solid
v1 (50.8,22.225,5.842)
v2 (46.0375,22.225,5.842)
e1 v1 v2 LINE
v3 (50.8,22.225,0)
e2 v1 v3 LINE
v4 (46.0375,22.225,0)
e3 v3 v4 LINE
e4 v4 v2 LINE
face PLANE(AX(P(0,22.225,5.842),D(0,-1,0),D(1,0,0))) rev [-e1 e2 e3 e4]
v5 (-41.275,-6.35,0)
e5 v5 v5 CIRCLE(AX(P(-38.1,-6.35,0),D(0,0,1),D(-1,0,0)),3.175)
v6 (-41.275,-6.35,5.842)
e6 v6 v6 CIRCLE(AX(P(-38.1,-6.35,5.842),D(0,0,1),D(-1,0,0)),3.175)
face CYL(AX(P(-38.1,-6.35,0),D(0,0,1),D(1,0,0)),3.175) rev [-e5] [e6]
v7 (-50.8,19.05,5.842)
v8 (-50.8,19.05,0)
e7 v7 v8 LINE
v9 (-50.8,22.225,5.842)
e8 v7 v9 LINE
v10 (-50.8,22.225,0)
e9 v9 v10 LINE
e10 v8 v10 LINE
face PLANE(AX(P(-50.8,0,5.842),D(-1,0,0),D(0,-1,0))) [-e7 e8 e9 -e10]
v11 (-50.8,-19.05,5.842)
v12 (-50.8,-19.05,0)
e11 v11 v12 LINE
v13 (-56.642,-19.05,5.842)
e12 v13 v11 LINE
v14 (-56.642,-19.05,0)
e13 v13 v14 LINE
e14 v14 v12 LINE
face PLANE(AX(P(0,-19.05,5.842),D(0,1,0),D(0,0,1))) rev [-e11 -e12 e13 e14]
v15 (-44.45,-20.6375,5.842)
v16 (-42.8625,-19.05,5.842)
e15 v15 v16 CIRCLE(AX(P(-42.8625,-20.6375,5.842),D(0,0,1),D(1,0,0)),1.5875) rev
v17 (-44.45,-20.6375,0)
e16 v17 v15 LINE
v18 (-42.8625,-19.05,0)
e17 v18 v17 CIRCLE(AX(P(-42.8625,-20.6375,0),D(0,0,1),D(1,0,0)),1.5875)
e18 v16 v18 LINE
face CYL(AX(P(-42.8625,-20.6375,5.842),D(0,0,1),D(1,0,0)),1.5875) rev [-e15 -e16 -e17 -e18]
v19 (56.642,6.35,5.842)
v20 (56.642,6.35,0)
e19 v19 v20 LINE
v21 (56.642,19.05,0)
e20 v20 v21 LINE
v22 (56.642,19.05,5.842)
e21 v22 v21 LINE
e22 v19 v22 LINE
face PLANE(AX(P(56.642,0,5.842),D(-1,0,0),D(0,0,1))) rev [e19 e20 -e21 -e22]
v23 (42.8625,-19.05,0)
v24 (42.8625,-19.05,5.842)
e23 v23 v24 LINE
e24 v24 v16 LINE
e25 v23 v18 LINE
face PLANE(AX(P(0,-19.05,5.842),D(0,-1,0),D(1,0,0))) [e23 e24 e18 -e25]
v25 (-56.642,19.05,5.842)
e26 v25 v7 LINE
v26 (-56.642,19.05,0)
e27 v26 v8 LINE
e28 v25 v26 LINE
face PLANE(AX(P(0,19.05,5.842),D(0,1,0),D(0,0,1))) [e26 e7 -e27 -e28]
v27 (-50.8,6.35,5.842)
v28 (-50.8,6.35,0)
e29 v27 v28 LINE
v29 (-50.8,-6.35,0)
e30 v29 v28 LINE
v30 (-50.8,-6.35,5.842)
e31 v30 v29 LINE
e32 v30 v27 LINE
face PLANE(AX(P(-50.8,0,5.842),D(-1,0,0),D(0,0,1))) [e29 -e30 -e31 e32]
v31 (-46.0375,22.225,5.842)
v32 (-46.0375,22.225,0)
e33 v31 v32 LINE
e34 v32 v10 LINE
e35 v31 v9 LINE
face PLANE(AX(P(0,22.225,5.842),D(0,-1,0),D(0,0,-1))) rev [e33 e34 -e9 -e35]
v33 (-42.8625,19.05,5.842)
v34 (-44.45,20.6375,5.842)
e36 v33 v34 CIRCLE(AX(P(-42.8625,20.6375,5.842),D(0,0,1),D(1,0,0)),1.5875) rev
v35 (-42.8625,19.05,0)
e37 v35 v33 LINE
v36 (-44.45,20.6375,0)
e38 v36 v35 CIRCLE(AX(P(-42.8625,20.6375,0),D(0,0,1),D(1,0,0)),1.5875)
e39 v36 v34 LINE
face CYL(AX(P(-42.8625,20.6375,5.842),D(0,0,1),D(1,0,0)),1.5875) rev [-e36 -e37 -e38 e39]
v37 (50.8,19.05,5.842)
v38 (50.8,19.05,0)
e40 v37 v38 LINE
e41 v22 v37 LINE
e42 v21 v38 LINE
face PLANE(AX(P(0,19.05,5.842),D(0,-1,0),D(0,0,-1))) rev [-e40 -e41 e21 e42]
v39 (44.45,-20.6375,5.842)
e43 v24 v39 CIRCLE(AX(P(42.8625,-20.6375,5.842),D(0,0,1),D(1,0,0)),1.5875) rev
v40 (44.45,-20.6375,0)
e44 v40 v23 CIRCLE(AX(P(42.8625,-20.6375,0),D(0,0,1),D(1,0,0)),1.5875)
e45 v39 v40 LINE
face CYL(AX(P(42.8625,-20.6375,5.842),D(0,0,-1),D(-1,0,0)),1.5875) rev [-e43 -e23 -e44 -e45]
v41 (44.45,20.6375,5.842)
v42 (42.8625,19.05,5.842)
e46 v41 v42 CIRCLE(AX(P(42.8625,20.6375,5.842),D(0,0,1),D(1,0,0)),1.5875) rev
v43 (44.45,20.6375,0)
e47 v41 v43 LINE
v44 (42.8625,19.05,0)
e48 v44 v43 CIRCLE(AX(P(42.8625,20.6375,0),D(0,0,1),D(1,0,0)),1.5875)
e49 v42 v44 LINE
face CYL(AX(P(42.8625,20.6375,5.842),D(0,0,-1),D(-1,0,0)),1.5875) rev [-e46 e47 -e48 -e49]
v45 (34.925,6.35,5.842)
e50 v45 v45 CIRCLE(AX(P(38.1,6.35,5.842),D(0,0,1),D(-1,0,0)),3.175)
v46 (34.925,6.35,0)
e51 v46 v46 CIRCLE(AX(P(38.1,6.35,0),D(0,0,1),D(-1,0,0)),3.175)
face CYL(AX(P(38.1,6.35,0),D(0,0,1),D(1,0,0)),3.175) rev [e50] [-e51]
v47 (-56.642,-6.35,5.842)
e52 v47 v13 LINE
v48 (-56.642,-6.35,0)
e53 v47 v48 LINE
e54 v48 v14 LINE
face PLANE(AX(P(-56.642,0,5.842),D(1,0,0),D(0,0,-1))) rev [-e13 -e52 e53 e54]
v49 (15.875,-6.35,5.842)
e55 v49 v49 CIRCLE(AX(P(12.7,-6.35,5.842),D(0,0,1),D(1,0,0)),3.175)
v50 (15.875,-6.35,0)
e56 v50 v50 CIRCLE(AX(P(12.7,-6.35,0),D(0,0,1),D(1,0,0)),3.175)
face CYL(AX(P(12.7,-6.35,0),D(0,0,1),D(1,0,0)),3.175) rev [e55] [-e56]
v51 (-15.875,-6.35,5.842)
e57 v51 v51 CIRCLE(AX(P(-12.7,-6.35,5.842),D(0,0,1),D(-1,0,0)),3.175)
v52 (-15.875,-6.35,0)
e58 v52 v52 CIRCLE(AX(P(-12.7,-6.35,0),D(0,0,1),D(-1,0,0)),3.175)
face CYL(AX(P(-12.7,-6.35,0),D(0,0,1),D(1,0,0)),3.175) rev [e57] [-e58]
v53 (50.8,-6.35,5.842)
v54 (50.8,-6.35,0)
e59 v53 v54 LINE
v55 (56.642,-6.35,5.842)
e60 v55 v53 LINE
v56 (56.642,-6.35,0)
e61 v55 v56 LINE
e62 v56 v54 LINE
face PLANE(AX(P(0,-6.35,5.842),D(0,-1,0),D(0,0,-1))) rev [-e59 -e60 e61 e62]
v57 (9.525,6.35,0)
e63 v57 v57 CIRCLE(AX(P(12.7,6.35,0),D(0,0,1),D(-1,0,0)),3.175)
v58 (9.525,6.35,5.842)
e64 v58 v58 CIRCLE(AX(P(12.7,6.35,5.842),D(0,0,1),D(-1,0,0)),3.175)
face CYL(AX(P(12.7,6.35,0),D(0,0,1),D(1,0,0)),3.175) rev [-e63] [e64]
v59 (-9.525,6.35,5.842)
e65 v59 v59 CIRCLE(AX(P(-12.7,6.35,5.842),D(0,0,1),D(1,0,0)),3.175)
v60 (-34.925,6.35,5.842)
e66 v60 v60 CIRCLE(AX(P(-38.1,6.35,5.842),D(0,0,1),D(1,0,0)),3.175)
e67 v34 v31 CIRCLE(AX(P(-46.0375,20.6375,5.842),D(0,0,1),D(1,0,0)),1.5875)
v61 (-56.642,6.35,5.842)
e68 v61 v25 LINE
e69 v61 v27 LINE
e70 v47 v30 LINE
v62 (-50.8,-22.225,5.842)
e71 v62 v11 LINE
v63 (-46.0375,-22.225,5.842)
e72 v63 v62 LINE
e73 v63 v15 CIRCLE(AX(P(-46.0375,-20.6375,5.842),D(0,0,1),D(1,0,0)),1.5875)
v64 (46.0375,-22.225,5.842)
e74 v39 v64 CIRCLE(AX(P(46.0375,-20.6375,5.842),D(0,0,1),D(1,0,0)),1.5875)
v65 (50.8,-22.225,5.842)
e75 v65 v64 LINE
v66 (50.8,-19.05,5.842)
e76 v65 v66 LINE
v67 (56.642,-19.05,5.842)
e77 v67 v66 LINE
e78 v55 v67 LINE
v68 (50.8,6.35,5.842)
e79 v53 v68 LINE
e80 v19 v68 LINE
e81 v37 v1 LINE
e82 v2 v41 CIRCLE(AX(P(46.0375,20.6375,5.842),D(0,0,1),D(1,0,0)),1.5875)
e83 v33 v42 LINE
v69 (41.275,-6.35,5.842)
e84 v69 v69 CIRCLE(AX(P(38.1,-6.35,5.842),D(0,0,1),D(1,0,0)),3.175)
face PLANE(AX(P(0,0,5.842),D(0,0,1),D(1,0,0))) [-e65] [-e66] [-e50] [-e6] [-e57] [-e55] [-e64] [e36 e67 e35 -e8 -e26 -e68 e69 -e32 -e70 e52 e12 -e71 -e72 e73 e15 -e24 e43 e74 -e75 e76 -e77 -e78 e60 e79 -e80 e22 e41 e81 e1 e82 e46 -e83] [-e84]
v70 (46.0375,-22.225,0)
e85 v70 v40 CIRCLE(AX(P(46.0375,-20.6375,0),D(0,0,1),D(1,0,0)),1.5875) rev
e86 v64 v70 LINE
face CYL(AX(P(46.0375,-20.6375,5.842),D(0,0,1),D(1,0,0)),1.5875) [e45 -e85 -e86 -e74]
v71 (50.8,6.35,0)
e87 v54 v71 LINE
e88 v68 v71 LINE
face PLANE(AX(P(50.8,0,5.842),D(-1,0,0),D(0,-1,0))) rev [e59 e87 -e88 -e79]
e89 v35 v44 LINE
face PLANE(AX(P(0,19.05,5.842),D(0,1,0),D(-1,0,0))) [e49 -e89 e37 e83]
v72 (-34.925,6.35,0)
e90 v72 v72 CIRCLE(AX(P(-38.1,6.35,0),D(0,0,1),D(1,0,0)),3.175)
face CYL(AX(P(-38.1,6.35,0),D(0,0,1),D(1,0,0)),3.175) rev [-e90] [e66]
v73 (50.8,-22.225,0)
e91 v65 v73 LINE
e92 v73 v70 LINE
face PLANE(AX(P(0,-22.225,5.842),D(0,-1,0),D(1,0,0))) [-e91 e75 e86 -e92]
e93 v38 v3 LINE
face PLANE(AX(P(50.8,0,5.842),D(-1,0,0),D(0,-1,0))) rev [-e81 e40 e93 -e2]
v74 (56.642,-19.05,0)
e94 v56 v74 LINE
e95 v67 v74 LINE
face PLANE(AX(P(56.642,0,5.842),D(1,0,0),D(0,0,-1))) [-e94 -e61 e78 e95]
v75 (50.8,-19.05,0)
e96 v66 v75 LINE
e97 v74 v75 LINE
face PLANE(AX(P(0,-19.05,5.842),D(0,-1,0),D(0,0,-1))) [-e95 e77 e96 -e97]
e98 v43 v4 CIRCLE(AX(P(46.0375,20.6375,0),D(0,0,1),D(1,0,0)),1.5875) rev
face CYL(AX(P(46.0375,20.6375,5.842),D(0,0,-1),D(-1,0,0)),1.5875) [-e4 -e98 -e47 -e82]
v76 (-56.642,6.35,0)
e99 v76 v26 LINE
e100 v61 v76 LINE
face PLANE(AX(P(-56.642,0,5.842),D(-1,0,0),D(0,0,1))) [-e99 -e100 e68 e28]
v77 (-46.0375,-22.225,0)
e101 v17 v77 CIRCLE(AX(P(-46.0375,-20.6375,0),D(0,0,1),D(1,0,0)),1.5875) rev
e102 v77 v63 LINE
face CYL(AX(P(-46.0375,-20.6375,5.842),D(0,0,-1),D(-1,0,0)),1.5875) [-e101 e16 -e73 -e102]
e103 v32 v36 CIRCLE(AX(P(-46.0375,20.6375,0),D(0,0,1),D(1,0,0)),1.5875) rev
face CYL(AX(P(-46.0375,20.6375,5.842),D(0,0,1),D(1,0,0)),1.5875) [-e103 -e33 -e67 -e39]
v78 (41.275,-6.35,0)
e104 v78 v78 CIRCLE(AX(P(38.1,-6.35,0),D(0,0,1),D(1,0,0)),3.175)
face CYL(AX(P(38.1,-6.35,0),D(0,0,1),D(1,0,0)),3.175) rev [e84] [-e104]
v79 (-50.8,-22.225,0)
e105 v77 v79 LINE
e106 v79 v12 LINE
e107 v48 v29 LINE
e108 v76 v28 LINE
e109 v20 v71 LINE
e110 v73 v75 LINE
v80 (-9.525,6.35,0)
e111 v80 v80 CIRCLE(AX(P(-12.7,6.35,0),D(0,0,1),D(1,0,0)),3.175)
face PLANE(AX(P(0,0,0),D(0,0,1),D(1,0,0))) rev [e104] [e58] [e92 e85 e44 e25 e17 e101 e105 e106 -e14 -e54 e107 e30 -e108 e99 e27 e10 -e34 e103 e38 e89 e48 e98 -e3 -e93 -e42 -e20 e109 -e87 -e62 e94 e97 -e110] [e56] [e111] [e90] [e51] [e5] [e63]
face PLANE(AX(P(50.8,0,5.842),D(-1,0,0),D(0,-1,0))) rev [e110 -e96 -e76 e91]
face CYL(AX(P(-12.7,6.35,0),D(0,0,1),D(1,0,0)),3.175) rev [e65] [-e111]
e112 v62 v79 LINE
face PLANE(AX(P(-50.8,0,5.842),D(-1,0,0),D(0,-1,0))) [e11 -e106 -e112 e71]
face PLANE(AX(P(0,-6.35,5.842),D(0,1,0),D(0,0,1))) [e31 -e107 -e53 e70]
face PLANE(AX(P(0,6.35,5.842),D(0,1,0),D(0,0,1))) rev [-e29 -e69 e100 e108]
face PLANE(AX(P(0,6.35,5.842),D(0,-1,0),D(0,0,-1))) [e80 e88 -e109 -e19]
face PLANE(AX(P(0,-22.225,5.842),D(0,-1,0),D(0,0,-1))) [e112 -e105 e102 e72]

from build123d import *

# Parameters (mm, degrees)
BOSS_EXTRUDE1_DEPTH = 5.842
FILLET1_R           = 1.5875
SKETCH2_R           = 3.175
CUT_EXTRUDE1_DEPTH  = 62.126064432


with BuildPart() as part:
    # Sketch1 → Boss-Extrude1 (new body)
    with BuildSketch(Plane.XY):
        Polygon((50.8, -22.225), (44.45, -22.225), (44.45, -19.05), (-44.45, -19.05), (-44.45, -22.225), (-50.8, -22.225), (-50.8, -19.05), (-56.642, -19.05), (-56.642, -6.35), (-50.8, -6.35), (-50.8, 6.35), (-56.642, 6.35), (-56.642, 19.05), (-50.8, 19.05), (-50.8, 22.225), (-44.45, 22.225), (-44.45, 19.05), (44.45, 19.05), (44.45, 22.225), (50.8, 22.225), (50.8, 19.05), (56.642, 19.05), (56.642, 6.35), (50.8, 6.35), (50.8, -6.35), (56.642, -6.35), (56.642, -19.05), (50.8, -19.05), align=None)
    extrude(amount=BOSS_EXTRUDE1_DEPTH)

    # Fillet1
    fillet1_edges = [part.edges().sort_by_distance(p)[0] for p in [
        (-44.45, -19.05, 2.921),
        (44.45, -19.05, 2.921),
        (44.45, 19.05, 2.921),
        (-44.45, 19.05, 2.921),
    ]]
    fillet(fillet1_edges, radius=FILLET1_R)
    fillet1_2_edges = [part.edges().sort_by_distance(p)[0] for p in [
        (-44.45, -22.225, 2.921),
        (44.45, -22.225, 2.921),
        (44.45, 22.225, 2.921),
        (-44.45, 22.225, 2.921),
    ]]
    fillet(fillet1_2_edges, radius=FILLET1_R - 0.0001)  # a hair under: the kernel refuses the full size

    # Sketch2 → Cut-Extrude1 (cut, through all)
    with BuildSketch(Plane.XY.offset(5.842)):
        with Locations((-38.1, 6.35)):
            Circle(SKETCH2_R)
        with Locations((-12.7, 6.35)):
            Circle(SKETCH2_R)
        with Locations(Location((-12.7, -6.35, 0), (0, 0, 180))):
            Circle(SKETCH2_R)
        with Locations(Location((-38.1, -6.35, 0), (0, 0, 180))):
            Circle(SKETCH2_R)
        with Locations((38.1, -6.35)):
            Circle(SKETCH2_R)
        with Locations((12.7, -6.35)):
            Circle(SKETCH2_R)
        with Locations(Location((12.7, 6.35, 0), (0, 0, 180))):
            Circle(SKETCH2_R)
        with Locations(Location((38.1, 6.35, 0), (0, 0, 180))):
            Circle(SKETCH2_R)
    extrude(amount=-CUT_EXTRUDE1_DEPTH, mode=Mode.SUBTRACT)


solid = part.part
